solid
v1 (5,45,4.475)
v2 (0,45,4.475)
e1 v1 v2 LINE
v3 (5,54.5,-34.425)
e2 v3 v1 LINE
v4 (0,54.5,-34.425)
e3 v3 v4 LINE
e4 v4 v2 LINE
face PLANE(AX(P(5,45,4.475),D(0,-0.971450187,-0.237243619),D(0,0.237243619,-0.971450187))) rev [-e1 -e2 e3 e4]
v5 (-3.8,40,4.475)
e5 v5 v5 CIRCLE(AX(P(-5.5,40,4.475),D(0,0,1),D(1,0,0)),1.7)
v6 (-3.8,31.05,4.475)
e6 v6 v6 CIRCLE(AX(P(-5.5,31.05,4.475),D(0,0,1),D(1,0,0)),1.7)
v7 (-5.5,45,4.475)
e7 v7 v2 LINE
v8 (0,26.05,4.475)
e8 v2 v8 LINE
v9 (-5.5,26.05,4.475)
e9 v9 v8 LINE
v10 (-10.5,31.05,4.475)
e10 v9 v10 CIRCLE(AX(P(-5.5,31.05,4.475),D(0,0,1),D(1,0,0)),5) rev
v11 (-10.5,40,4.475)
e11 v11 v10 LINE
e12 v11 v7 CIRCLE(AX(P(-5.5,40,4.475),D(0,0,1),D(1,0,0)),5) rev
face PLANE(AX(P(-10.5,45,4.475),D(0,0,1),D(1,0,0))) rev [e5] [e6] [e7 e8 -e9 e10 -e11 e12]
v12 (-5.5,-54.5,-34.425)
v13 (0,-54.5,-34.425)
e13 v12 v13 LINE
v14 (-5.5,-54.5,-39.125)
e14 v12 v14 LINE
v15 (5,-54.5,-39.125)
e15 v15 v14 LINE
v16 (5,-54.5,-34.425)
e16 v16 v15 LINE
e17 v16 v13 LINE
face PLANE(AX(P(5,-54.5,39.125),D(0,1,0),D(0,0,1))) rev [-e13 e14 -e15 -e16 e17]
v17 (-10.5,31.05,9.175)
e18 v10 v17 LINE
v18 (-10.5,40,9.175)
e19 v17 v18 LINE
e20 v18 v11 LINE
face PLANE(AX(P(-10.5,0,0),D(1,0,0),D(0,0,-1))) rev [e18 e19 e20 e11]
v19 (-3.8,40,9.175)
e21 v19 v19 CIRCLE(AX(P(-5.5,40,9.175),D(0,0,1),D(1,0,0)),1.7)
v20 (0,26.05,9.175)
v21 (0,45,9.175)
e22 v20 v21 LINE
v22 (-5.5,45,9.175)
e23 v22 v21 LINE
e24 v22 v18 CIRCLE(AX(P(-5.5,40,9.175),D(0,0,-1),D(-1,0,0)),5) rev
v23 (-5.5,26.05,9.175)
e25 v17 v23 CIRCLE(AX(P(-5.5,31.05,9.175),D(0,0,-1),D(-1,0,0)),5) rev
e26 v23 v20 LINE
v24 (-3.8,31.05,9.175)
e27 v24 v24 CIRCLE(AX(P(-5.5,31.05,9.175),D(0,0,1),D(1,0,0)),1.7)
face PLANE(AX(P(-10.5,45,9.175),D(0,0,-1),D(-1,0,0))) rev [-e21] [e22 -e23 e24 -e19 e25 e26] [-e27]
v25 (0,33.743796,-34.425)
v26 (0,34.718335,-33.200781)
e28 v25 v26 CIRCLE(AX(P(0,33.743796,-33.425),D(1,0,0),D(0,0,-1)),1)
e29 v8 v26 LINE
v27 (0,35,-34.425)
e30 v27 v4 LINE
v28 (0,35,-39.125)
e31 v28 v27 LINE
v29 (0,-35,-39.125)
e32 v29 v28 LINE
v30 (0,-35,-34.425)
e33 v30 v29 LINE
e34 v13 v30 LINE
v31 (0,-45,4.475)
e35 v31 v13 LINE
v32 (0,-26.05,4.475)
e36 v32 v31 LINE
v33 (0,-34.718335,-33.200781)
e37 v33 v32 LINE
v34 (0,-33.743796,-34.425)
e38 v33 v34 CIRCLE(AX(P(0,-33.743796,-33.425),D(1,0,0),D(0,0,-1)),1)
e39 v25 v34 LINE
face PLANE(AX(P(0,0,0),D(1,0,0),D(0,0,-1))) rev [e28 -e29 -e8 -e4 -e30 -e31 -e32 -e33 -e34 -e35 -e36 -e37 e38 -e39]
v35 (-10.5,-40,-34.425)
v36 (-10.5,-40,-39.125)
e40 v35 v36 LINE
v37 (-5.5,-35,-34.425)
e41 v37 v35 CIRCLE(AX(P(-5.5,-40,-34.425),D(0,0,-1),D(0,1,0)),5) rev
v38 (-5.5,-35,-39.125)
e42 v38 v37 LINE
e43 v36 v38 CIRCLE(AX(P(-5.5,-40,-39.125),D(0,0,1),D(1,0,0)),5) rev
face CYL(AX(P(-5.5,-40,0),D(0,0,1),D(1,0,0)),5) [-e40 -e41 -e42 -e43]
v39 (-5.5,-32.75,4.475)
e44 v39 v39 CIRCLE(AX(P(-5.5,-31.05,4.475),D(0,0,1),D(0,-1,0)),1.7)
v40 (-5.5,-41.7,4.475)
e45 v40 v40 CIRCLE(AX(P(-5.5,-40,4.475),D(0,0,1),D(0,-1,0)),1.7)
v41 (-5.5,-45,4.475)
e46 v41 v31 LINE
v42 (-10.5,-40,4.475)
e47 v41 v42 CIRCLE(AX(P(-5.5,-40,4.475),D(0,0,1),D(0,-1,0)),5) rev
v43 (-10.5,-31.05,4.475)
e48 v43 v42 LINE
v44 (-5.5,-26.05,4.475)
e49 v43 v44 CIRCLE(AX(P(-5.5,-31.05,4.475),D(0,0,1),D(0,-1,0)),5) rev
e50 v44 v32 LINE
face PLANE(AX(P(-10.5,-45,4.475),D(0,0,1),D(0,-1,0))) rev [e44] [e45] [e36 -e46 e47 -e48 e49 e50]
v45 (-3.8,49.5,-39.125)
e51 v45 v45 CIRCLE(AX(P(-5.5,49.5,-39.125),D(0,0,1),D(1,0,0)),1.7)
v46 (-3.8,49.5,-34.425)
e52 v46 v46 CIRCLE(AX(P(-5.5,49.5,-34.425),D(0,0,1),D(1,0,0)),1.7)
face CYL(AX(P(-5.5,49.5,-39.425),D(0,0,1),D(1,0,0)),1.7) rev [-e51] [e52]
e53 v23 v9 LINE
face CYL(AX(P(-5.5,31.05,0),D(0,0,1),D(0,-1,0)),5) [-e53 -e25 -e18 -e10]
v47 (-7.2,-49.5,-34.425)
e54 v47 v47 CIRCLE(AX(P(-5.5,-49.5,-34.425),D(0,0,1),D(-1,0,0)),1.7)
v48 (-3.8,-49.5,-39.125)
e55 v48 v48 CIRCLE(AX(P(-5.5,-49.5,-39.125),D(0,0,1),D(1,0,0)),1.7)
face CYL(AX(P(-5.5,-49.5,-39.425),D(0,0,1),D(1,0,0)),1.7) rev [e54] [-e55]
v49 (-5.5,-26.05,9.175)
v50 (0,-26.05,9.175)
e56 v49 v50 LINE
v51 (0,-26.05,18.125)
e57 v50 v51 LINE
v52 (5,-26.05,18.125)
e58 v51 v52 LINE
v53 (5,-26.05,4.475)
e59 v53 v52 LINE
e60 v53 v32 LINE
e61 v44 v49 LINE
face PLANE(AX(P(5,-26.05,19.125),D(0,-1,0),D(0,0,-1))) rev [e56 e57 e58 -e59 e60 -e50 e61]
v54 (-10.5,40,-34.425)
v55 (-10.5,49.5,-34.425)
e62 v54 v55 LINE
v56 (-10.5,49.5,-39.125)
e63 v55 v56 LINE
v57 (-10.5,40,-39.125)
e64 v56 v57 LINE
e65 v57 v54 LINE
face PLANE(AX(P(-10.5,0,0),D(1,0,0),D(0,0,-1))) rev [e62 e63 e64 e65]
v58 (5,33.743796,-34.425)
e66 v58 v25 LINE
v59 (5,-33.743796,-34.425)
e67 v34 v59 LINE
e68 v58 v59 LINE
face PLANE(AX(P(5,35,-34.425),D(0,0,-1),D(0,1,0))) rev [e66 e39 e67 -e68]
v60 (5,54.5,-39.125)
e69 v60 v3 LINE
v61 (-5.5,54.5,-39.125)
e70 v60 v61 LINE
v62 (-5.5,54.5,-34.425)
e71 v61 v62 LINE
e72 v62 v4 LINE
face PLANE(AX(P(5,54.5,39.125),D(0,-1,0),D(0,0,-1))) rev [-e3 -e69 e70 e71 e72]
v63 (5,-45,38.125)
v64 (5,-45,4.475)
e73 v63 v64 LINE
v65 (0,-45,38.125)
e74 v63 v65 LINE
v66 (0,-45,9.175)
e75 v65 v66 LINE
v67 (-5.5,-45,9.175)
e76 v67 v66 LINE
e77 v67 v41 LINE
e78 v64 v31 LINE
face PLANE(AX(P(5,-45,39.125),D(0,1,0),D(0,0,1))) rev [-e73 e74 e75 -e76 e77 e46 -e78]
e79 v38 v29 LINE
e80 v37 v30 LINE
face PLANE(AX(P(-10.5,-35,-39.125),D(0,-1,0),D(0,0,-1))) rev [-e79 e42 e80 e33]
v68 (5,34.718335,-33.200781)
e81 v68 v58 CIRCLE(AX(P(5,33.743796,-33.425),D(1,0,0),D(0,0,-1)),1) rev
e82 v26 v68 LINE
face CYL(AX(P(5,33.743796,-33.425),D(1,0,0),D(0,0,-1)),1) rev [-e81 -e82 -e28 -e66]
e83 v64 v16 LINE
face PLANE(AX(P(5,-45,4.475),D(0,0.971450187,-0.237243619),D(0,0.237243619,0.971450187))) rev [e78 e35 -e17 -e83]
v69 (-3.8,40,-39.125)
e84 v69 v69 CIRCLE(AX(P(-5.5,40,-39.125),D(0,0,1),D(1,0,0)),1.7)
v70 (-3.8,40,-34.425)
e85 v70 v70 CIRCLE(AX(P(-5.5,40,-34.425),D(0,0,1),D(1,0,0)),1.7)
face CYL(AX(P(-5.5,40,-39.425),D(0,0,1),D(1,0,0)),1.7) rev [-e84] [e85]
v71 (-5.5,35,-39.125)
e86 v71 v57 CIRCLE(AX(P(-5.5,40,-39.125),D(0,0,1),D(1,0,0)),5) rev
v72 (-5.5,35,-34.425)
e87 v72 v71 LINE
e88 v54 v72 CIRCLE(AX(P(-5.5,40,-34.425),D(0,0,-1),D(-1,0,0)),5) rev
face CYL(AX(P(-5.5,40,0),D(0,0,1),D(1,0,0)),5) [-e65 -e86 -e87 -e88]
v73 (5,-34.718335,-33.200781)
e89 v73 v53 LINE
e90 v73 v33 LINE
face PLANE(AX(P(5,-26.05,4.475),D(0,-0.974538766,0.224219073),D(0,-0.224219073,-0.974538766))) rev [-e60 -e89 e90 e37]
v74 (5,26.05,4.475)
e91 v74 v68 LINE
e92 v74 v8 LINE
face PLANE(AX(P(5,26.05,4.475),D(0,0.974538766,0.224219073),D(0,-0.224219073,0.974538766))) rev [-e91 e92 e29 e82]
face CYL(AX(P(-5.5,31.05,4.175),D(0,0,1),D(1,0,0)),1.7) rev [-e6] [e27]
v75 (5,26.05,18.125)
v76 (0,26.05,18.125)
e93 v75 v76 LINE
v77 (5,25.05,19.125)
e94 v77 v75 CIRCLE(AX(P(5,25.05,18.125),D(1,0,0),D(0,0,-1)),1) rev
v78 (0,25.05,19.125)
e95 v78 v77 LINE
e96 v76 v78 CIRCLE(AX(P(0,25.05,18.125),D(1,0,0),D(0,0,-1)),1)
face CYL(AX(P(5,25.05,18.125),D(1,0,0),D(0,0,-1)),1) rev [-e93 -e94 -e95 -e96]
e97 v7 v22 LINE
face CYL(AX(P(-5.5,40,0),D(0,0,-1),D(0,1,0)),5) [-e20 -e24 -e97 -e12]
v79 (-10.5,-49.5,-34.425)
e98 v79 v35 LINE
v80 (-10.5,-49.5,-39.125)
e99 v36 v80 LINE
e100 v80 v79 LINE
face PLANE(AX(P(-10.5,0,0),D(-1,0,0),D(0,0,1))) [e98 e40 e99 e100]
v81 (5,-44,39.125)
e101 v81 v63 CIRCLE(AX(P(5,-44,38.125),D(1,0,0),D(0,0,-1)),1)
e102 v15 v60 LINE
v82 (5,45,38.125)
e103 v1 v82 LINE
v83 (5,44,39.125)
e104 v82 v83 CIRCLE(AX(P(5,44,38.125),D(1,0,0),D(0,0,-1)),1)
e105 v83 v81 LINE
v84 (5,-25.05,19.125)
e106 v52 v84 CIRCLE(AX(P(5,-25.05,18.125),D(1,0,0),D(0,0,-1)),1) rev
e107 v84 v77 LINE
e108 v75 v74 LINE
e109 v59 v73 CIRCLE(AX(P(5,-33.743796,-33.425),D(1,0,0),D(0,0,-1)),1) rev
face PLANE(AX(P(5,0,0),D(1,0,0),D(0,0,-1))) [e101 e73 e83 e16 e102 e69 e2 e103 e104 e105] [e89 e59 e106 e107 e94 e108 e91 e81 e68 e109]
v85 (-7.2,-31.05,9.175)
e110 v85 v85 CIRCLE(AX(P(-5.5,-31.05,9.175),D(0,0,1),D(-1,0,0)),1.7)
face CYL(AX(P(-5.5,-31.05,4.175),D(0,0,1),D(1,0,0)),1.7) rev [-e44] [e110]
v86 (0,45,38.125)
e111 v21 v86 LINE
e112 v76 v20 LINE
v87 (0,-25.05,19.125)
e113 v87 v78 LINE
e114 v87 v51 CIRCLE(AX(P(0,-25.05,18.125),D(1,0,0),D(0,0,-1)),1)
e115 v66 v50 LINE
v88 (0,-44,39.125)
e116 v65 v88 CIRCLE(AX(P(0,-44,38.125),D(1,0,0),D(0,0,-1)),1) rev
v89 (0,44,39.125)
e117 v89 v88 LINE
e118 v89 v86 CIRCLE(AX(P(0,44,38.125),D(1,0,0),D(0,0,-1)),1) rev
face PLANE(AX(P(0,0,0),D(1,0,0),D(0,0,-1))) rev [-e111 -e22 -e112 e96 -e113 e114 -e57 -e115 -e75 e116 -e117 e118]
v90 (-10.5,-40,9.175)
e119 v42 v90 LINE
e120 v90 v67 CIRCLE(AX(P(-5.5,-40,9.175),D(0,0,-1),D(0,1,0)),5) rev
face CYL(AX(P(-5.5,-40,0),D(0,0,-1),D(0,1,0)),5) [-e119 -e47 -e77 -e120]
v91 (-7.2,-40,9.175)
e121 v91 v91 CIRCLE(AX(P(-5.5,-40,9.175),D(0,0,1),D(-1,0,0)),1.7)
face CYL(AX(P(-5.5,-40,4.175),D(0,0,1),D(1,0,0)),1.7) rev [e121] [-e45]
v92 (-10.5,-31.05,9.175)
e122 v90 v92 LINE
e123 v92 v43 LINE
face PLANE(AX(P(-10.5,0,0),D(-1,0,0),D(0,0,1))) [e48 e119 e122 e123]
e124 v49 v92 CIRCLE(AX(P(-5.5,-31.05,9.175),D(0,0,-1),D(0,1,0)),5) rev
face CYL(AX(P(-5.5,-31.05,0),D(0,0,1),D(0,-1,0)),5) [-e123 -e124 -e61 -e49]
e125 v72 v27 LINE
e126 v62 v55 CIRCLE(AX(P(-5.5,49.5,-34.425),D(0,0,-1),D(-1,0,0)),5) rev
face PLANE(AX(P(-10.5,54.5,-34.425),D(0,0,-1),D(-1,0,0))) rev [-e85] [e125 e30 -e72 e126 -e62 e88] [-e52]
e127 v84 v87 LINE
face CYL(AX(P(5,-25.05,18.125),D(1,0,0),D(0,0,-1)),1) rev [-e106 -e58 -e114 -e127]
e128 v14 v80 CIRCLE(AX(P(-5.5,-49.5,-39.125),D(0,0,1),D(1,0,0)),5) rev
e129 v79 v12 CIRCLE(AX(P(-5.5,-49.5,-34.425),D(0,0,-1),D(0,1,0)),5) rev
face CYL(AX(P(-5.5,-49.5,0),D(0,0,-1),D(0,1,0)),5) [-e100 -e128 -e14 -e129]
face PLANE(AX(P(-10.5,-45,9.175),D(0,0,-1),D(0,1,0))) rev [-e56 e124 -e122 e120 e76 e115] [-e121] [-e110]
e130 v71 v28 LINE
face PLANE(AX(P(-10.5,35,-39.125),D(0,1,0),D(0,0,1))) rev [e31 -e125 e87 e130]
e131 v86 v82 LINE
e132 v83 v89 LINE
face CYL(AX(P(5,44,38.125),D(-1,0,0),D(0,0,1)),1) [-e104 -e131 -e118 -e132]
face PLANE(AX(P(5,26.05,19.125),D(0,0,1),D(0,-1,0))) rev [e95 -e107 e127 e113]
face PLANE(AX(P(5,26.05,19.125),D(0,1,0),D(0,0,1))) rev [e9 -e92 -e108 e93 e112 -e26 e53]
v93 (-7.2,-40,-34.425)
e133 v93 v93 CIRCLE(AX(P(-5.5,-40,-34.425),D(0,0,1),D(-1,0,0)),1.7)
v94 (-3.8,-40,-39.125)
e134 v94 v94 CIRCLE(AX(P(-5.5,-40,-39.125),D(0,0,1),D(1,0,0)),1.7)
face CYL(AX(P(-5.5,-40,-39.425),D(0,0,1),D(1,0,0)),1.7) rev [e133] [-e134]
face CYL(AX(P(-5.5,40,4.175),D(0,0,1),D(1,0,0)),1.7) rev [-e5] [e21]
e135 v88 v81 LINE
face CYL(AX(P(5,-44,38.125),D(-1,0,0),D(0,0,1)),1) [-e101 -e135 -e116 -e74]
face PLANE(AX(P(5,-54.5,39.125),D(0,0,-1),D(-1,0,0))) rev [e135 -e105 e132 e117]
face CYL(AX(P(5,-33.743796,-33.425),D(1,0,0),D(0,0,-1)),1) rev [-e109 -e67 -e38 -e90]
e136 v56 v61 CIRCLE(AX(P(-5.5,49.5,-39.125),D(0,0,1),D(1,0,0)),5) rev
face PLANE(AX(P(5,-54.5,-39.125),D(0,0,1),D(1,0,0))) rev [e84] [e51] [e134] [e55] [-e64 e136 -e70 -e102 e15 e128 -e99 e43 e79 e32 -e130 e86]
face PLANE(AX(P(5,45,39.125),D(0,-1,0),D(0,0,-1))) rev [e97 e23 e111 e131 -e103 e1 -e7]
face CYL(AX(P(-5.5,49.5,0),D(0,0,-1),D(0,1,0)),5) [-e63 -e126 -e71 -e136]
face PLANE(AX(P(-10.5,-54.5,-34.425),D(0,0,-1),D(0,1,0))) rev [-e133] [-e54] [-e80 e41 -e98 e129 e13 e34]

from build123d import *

# Parameters (mm, degrees)
SKETCH_1_W          = 109
SKETCH_1_H          = 78.25
EXTRUDE_1_DEPTH     = 5
CUT_EXTRUDE_1_DEPTH = 5
SKETCH_3_W          = 18.95
SKETCH_3_H          = 4.7
SKETCH_3_W_2        = 19.5
EXTRUDE_2_DEPTH     = 10.5
SKETCH_4_R          = 1.7
CUT_EXTRUDE_2_DEPTH = 5
SKETCH_5_R          = 1.7
CUT_EXTRUDE_3_DEPTH = 5
FILLET_1_R          = 5
FILLET_2_R          = 1
FILLET_3_R          = 1


with BuildPart() as part:
    # 草圖1 → 填料-伸長1 (new body)
    with BuildSketch(Plane.YZ):
        Rectangle(SKETCH_1_W, SKETCH_1_H)
    extrude(amount=EXTRUDE_1_DEPTH)

    # 草圖2 → 除料-伸長1 (cut)
    with BuildSketch(Plane(origin=(0, 0, 0), x_dir=(0, -1, 0), z_dir=(-1, 0, 0))):
        Polygon((-54.5, 39.125), (-54.5, -34.425), (-45, 4.475), (-45, 39.125), align=None)
        Polygon((45, 39.125), (45, 4.475), (54.5, -34.425), (54.5, 39.125), align=None)
        Polygon((-35, -34.425), (35, -34.425), (26.05, 4.475), (26.05, 19.125), (-26.05, 19.125), (-26.05, 4.475), align=None)
    extrude(amount=-CUT_EXTRUDE_1_DEPTH, mode=Mode.SUBTRACT)

    # 草圖3 → 填料-伸長2 (add)
    with BuildSketch(Plane(origin=(0, 0, 0), x_dir=(0, -1, 0), z_dir=(-1, 0, 0))):
        with Locations((-35.525, 6.825)):
            Rectangle(SKETCH_3_W, SKETCH_3_H)
        with Locations((-44.75, -36.775)):
            Rectangle(SKETCH_3_W_2, SKETCH_3_H)
        with Locations((44.75, -36.775)):
            Rectangle(SKETCH_3_W_2, SKETCH_3_H)
        with Locations((35.525, 6.825)):
            Rectangle(SKETCH_3_W, SKETCH_3_H)
    extrude(amount=EXTRUDE_2_DEPTH)

    # 草圖4 → 除料-伸長2 (cut)
    with BuildSketch(Plane(origin=(0, 0, 9.175), x_dir=(0, -1, 0), z_dir=(0, 0, 1))):
        with Locations(Location((-40, -5.5, 0), (0, 0, 90))):
            Circle(SKETCH_4_R)
        with Locations(Location((-31.05, -5.5, 0), (0, 0, 90))):
            Circle(SKETCH_4_R)
        with Locations((31.05, -5.5)):
            Circle(SKETCH_4_R)
        with Locations((40, -5.5)):
            Circle(SKETCH_4_R)
    extrude(amount=-CUT_EXTRUDE_2_DEPTH, mode=Mode.SUBTRACT)

    # 草圖5 → 除料-伸長3 (cut)
    with BuildSketch(Plane(origin=(0, 0, -34.425), x_dir=(0, -1, 0), z_dir=(0, 0, 1))):
        with Locations(Location((-49.5, -5.5, 0), (0, 0, 90))):
            Circle(SKETCH_5_R)
        with Locations(Location((-40, -5.5, 0), (0, 0, 90))):
            Circle(SKETCH_5_R)
        with Locations((40, -5.5)):
            Circle(SKETCH_5_R)
        with Locations(Location((49.5, -5.5, 0), (0, 0, 90))):
            Circle(SKETCH_5_R)
    extrude(amount=-CUT_EXTRUDE_3_DEPTH, mode=Mode.SUBTRACT)

    # 圓角1
    fillet_1_edges = [part.edges().sort_by_distance(p)[0] for p in [
        (-10.5, -45, 6.825),
        (-10.5, -26.05, 6.825),
        (-10.5, -54.5, -36.775),
        (-10.5, -35, -36.775),
        (-10.5, 54.5, -36.775),
        (-10.5, 35, -36.775),
        (-10.5, 45, 6.825),
        (-10.5, 26.05, 6.825),
    ]]
    fillet(fillet_1_edges, radius=FILLET_1_R)

    # 圓角2
    fillet_2_edges = [part.edges().sort_by_distance(p)[0] for p in [
        (2.5, 45, 39.125),
        (2.5, -45, 39.125),
    ]]
    fillet(fillet_2_edges, radius=FILLET_2_R)

    # 圓角3
    # the kernel refuses this fillet: 1 mm, written as the material it adds along each edge
    with BuildSketch(Plane(origin=(0, 35, -34.425), x_dir=(0, -1, 0), z_dir=(1, 0, 0))) as fillet_3_piece_1:
        with BuildLine():
            CenterArc((FILLET_3_R * 1.25620356602, -FILLET_3_R), FILLET_3_R, 90, 102.956961135)
            Line((FILLET_3_R * 0.281664799684, -FILLET_3_R * 1.22421907349), (0, 0))
            Line((0, 0), (FILLET_3_R * 1.25620356602, 0))
        make_face()
    extrude(amount=5)
    with BuildSketch(Plane(origin=(0, 26.05, 19.125), x_dir=(0, -1, 0), z_dir=(1, 0, 0)), Plane(origin=(0, -26.05, 19.125), x_dir=(0, 0, -1), z_dir=(1, 0, 0))) as fillet_3_piece_2:
        with BuildLine():
            CenterArc((FILLET_3_R, FILLET_3_R), FILLET_3_R, 180, 90)
            Line((0, FILLET_3_R), (0, 0))
            Line((0, 0), (FILLET_3_R, 0))
        make_face()
    extrude(amount=5)
    with BuildSketch(Plane(origin=(0, -35, -34.425), x_dir=(0, 1, 0), z_dir=(1, 0, 0))) as fillet_3_piece_3:
        with BuildLine():
            CenterArc((FILLET_3_R * 1.25620356602, FILLET_3_R), FILLET_3_R, 167.043038865, 102.956961135)
            Line((FILLET_3_R * 0.281664799684, FILLET_3_R * 1.22421907349), (0, 0))
            Line((0, 0), (FILLET_3_R * 1.25620356602, 0))
        make_face()
    extrude(amount=5)


solid = part.part
